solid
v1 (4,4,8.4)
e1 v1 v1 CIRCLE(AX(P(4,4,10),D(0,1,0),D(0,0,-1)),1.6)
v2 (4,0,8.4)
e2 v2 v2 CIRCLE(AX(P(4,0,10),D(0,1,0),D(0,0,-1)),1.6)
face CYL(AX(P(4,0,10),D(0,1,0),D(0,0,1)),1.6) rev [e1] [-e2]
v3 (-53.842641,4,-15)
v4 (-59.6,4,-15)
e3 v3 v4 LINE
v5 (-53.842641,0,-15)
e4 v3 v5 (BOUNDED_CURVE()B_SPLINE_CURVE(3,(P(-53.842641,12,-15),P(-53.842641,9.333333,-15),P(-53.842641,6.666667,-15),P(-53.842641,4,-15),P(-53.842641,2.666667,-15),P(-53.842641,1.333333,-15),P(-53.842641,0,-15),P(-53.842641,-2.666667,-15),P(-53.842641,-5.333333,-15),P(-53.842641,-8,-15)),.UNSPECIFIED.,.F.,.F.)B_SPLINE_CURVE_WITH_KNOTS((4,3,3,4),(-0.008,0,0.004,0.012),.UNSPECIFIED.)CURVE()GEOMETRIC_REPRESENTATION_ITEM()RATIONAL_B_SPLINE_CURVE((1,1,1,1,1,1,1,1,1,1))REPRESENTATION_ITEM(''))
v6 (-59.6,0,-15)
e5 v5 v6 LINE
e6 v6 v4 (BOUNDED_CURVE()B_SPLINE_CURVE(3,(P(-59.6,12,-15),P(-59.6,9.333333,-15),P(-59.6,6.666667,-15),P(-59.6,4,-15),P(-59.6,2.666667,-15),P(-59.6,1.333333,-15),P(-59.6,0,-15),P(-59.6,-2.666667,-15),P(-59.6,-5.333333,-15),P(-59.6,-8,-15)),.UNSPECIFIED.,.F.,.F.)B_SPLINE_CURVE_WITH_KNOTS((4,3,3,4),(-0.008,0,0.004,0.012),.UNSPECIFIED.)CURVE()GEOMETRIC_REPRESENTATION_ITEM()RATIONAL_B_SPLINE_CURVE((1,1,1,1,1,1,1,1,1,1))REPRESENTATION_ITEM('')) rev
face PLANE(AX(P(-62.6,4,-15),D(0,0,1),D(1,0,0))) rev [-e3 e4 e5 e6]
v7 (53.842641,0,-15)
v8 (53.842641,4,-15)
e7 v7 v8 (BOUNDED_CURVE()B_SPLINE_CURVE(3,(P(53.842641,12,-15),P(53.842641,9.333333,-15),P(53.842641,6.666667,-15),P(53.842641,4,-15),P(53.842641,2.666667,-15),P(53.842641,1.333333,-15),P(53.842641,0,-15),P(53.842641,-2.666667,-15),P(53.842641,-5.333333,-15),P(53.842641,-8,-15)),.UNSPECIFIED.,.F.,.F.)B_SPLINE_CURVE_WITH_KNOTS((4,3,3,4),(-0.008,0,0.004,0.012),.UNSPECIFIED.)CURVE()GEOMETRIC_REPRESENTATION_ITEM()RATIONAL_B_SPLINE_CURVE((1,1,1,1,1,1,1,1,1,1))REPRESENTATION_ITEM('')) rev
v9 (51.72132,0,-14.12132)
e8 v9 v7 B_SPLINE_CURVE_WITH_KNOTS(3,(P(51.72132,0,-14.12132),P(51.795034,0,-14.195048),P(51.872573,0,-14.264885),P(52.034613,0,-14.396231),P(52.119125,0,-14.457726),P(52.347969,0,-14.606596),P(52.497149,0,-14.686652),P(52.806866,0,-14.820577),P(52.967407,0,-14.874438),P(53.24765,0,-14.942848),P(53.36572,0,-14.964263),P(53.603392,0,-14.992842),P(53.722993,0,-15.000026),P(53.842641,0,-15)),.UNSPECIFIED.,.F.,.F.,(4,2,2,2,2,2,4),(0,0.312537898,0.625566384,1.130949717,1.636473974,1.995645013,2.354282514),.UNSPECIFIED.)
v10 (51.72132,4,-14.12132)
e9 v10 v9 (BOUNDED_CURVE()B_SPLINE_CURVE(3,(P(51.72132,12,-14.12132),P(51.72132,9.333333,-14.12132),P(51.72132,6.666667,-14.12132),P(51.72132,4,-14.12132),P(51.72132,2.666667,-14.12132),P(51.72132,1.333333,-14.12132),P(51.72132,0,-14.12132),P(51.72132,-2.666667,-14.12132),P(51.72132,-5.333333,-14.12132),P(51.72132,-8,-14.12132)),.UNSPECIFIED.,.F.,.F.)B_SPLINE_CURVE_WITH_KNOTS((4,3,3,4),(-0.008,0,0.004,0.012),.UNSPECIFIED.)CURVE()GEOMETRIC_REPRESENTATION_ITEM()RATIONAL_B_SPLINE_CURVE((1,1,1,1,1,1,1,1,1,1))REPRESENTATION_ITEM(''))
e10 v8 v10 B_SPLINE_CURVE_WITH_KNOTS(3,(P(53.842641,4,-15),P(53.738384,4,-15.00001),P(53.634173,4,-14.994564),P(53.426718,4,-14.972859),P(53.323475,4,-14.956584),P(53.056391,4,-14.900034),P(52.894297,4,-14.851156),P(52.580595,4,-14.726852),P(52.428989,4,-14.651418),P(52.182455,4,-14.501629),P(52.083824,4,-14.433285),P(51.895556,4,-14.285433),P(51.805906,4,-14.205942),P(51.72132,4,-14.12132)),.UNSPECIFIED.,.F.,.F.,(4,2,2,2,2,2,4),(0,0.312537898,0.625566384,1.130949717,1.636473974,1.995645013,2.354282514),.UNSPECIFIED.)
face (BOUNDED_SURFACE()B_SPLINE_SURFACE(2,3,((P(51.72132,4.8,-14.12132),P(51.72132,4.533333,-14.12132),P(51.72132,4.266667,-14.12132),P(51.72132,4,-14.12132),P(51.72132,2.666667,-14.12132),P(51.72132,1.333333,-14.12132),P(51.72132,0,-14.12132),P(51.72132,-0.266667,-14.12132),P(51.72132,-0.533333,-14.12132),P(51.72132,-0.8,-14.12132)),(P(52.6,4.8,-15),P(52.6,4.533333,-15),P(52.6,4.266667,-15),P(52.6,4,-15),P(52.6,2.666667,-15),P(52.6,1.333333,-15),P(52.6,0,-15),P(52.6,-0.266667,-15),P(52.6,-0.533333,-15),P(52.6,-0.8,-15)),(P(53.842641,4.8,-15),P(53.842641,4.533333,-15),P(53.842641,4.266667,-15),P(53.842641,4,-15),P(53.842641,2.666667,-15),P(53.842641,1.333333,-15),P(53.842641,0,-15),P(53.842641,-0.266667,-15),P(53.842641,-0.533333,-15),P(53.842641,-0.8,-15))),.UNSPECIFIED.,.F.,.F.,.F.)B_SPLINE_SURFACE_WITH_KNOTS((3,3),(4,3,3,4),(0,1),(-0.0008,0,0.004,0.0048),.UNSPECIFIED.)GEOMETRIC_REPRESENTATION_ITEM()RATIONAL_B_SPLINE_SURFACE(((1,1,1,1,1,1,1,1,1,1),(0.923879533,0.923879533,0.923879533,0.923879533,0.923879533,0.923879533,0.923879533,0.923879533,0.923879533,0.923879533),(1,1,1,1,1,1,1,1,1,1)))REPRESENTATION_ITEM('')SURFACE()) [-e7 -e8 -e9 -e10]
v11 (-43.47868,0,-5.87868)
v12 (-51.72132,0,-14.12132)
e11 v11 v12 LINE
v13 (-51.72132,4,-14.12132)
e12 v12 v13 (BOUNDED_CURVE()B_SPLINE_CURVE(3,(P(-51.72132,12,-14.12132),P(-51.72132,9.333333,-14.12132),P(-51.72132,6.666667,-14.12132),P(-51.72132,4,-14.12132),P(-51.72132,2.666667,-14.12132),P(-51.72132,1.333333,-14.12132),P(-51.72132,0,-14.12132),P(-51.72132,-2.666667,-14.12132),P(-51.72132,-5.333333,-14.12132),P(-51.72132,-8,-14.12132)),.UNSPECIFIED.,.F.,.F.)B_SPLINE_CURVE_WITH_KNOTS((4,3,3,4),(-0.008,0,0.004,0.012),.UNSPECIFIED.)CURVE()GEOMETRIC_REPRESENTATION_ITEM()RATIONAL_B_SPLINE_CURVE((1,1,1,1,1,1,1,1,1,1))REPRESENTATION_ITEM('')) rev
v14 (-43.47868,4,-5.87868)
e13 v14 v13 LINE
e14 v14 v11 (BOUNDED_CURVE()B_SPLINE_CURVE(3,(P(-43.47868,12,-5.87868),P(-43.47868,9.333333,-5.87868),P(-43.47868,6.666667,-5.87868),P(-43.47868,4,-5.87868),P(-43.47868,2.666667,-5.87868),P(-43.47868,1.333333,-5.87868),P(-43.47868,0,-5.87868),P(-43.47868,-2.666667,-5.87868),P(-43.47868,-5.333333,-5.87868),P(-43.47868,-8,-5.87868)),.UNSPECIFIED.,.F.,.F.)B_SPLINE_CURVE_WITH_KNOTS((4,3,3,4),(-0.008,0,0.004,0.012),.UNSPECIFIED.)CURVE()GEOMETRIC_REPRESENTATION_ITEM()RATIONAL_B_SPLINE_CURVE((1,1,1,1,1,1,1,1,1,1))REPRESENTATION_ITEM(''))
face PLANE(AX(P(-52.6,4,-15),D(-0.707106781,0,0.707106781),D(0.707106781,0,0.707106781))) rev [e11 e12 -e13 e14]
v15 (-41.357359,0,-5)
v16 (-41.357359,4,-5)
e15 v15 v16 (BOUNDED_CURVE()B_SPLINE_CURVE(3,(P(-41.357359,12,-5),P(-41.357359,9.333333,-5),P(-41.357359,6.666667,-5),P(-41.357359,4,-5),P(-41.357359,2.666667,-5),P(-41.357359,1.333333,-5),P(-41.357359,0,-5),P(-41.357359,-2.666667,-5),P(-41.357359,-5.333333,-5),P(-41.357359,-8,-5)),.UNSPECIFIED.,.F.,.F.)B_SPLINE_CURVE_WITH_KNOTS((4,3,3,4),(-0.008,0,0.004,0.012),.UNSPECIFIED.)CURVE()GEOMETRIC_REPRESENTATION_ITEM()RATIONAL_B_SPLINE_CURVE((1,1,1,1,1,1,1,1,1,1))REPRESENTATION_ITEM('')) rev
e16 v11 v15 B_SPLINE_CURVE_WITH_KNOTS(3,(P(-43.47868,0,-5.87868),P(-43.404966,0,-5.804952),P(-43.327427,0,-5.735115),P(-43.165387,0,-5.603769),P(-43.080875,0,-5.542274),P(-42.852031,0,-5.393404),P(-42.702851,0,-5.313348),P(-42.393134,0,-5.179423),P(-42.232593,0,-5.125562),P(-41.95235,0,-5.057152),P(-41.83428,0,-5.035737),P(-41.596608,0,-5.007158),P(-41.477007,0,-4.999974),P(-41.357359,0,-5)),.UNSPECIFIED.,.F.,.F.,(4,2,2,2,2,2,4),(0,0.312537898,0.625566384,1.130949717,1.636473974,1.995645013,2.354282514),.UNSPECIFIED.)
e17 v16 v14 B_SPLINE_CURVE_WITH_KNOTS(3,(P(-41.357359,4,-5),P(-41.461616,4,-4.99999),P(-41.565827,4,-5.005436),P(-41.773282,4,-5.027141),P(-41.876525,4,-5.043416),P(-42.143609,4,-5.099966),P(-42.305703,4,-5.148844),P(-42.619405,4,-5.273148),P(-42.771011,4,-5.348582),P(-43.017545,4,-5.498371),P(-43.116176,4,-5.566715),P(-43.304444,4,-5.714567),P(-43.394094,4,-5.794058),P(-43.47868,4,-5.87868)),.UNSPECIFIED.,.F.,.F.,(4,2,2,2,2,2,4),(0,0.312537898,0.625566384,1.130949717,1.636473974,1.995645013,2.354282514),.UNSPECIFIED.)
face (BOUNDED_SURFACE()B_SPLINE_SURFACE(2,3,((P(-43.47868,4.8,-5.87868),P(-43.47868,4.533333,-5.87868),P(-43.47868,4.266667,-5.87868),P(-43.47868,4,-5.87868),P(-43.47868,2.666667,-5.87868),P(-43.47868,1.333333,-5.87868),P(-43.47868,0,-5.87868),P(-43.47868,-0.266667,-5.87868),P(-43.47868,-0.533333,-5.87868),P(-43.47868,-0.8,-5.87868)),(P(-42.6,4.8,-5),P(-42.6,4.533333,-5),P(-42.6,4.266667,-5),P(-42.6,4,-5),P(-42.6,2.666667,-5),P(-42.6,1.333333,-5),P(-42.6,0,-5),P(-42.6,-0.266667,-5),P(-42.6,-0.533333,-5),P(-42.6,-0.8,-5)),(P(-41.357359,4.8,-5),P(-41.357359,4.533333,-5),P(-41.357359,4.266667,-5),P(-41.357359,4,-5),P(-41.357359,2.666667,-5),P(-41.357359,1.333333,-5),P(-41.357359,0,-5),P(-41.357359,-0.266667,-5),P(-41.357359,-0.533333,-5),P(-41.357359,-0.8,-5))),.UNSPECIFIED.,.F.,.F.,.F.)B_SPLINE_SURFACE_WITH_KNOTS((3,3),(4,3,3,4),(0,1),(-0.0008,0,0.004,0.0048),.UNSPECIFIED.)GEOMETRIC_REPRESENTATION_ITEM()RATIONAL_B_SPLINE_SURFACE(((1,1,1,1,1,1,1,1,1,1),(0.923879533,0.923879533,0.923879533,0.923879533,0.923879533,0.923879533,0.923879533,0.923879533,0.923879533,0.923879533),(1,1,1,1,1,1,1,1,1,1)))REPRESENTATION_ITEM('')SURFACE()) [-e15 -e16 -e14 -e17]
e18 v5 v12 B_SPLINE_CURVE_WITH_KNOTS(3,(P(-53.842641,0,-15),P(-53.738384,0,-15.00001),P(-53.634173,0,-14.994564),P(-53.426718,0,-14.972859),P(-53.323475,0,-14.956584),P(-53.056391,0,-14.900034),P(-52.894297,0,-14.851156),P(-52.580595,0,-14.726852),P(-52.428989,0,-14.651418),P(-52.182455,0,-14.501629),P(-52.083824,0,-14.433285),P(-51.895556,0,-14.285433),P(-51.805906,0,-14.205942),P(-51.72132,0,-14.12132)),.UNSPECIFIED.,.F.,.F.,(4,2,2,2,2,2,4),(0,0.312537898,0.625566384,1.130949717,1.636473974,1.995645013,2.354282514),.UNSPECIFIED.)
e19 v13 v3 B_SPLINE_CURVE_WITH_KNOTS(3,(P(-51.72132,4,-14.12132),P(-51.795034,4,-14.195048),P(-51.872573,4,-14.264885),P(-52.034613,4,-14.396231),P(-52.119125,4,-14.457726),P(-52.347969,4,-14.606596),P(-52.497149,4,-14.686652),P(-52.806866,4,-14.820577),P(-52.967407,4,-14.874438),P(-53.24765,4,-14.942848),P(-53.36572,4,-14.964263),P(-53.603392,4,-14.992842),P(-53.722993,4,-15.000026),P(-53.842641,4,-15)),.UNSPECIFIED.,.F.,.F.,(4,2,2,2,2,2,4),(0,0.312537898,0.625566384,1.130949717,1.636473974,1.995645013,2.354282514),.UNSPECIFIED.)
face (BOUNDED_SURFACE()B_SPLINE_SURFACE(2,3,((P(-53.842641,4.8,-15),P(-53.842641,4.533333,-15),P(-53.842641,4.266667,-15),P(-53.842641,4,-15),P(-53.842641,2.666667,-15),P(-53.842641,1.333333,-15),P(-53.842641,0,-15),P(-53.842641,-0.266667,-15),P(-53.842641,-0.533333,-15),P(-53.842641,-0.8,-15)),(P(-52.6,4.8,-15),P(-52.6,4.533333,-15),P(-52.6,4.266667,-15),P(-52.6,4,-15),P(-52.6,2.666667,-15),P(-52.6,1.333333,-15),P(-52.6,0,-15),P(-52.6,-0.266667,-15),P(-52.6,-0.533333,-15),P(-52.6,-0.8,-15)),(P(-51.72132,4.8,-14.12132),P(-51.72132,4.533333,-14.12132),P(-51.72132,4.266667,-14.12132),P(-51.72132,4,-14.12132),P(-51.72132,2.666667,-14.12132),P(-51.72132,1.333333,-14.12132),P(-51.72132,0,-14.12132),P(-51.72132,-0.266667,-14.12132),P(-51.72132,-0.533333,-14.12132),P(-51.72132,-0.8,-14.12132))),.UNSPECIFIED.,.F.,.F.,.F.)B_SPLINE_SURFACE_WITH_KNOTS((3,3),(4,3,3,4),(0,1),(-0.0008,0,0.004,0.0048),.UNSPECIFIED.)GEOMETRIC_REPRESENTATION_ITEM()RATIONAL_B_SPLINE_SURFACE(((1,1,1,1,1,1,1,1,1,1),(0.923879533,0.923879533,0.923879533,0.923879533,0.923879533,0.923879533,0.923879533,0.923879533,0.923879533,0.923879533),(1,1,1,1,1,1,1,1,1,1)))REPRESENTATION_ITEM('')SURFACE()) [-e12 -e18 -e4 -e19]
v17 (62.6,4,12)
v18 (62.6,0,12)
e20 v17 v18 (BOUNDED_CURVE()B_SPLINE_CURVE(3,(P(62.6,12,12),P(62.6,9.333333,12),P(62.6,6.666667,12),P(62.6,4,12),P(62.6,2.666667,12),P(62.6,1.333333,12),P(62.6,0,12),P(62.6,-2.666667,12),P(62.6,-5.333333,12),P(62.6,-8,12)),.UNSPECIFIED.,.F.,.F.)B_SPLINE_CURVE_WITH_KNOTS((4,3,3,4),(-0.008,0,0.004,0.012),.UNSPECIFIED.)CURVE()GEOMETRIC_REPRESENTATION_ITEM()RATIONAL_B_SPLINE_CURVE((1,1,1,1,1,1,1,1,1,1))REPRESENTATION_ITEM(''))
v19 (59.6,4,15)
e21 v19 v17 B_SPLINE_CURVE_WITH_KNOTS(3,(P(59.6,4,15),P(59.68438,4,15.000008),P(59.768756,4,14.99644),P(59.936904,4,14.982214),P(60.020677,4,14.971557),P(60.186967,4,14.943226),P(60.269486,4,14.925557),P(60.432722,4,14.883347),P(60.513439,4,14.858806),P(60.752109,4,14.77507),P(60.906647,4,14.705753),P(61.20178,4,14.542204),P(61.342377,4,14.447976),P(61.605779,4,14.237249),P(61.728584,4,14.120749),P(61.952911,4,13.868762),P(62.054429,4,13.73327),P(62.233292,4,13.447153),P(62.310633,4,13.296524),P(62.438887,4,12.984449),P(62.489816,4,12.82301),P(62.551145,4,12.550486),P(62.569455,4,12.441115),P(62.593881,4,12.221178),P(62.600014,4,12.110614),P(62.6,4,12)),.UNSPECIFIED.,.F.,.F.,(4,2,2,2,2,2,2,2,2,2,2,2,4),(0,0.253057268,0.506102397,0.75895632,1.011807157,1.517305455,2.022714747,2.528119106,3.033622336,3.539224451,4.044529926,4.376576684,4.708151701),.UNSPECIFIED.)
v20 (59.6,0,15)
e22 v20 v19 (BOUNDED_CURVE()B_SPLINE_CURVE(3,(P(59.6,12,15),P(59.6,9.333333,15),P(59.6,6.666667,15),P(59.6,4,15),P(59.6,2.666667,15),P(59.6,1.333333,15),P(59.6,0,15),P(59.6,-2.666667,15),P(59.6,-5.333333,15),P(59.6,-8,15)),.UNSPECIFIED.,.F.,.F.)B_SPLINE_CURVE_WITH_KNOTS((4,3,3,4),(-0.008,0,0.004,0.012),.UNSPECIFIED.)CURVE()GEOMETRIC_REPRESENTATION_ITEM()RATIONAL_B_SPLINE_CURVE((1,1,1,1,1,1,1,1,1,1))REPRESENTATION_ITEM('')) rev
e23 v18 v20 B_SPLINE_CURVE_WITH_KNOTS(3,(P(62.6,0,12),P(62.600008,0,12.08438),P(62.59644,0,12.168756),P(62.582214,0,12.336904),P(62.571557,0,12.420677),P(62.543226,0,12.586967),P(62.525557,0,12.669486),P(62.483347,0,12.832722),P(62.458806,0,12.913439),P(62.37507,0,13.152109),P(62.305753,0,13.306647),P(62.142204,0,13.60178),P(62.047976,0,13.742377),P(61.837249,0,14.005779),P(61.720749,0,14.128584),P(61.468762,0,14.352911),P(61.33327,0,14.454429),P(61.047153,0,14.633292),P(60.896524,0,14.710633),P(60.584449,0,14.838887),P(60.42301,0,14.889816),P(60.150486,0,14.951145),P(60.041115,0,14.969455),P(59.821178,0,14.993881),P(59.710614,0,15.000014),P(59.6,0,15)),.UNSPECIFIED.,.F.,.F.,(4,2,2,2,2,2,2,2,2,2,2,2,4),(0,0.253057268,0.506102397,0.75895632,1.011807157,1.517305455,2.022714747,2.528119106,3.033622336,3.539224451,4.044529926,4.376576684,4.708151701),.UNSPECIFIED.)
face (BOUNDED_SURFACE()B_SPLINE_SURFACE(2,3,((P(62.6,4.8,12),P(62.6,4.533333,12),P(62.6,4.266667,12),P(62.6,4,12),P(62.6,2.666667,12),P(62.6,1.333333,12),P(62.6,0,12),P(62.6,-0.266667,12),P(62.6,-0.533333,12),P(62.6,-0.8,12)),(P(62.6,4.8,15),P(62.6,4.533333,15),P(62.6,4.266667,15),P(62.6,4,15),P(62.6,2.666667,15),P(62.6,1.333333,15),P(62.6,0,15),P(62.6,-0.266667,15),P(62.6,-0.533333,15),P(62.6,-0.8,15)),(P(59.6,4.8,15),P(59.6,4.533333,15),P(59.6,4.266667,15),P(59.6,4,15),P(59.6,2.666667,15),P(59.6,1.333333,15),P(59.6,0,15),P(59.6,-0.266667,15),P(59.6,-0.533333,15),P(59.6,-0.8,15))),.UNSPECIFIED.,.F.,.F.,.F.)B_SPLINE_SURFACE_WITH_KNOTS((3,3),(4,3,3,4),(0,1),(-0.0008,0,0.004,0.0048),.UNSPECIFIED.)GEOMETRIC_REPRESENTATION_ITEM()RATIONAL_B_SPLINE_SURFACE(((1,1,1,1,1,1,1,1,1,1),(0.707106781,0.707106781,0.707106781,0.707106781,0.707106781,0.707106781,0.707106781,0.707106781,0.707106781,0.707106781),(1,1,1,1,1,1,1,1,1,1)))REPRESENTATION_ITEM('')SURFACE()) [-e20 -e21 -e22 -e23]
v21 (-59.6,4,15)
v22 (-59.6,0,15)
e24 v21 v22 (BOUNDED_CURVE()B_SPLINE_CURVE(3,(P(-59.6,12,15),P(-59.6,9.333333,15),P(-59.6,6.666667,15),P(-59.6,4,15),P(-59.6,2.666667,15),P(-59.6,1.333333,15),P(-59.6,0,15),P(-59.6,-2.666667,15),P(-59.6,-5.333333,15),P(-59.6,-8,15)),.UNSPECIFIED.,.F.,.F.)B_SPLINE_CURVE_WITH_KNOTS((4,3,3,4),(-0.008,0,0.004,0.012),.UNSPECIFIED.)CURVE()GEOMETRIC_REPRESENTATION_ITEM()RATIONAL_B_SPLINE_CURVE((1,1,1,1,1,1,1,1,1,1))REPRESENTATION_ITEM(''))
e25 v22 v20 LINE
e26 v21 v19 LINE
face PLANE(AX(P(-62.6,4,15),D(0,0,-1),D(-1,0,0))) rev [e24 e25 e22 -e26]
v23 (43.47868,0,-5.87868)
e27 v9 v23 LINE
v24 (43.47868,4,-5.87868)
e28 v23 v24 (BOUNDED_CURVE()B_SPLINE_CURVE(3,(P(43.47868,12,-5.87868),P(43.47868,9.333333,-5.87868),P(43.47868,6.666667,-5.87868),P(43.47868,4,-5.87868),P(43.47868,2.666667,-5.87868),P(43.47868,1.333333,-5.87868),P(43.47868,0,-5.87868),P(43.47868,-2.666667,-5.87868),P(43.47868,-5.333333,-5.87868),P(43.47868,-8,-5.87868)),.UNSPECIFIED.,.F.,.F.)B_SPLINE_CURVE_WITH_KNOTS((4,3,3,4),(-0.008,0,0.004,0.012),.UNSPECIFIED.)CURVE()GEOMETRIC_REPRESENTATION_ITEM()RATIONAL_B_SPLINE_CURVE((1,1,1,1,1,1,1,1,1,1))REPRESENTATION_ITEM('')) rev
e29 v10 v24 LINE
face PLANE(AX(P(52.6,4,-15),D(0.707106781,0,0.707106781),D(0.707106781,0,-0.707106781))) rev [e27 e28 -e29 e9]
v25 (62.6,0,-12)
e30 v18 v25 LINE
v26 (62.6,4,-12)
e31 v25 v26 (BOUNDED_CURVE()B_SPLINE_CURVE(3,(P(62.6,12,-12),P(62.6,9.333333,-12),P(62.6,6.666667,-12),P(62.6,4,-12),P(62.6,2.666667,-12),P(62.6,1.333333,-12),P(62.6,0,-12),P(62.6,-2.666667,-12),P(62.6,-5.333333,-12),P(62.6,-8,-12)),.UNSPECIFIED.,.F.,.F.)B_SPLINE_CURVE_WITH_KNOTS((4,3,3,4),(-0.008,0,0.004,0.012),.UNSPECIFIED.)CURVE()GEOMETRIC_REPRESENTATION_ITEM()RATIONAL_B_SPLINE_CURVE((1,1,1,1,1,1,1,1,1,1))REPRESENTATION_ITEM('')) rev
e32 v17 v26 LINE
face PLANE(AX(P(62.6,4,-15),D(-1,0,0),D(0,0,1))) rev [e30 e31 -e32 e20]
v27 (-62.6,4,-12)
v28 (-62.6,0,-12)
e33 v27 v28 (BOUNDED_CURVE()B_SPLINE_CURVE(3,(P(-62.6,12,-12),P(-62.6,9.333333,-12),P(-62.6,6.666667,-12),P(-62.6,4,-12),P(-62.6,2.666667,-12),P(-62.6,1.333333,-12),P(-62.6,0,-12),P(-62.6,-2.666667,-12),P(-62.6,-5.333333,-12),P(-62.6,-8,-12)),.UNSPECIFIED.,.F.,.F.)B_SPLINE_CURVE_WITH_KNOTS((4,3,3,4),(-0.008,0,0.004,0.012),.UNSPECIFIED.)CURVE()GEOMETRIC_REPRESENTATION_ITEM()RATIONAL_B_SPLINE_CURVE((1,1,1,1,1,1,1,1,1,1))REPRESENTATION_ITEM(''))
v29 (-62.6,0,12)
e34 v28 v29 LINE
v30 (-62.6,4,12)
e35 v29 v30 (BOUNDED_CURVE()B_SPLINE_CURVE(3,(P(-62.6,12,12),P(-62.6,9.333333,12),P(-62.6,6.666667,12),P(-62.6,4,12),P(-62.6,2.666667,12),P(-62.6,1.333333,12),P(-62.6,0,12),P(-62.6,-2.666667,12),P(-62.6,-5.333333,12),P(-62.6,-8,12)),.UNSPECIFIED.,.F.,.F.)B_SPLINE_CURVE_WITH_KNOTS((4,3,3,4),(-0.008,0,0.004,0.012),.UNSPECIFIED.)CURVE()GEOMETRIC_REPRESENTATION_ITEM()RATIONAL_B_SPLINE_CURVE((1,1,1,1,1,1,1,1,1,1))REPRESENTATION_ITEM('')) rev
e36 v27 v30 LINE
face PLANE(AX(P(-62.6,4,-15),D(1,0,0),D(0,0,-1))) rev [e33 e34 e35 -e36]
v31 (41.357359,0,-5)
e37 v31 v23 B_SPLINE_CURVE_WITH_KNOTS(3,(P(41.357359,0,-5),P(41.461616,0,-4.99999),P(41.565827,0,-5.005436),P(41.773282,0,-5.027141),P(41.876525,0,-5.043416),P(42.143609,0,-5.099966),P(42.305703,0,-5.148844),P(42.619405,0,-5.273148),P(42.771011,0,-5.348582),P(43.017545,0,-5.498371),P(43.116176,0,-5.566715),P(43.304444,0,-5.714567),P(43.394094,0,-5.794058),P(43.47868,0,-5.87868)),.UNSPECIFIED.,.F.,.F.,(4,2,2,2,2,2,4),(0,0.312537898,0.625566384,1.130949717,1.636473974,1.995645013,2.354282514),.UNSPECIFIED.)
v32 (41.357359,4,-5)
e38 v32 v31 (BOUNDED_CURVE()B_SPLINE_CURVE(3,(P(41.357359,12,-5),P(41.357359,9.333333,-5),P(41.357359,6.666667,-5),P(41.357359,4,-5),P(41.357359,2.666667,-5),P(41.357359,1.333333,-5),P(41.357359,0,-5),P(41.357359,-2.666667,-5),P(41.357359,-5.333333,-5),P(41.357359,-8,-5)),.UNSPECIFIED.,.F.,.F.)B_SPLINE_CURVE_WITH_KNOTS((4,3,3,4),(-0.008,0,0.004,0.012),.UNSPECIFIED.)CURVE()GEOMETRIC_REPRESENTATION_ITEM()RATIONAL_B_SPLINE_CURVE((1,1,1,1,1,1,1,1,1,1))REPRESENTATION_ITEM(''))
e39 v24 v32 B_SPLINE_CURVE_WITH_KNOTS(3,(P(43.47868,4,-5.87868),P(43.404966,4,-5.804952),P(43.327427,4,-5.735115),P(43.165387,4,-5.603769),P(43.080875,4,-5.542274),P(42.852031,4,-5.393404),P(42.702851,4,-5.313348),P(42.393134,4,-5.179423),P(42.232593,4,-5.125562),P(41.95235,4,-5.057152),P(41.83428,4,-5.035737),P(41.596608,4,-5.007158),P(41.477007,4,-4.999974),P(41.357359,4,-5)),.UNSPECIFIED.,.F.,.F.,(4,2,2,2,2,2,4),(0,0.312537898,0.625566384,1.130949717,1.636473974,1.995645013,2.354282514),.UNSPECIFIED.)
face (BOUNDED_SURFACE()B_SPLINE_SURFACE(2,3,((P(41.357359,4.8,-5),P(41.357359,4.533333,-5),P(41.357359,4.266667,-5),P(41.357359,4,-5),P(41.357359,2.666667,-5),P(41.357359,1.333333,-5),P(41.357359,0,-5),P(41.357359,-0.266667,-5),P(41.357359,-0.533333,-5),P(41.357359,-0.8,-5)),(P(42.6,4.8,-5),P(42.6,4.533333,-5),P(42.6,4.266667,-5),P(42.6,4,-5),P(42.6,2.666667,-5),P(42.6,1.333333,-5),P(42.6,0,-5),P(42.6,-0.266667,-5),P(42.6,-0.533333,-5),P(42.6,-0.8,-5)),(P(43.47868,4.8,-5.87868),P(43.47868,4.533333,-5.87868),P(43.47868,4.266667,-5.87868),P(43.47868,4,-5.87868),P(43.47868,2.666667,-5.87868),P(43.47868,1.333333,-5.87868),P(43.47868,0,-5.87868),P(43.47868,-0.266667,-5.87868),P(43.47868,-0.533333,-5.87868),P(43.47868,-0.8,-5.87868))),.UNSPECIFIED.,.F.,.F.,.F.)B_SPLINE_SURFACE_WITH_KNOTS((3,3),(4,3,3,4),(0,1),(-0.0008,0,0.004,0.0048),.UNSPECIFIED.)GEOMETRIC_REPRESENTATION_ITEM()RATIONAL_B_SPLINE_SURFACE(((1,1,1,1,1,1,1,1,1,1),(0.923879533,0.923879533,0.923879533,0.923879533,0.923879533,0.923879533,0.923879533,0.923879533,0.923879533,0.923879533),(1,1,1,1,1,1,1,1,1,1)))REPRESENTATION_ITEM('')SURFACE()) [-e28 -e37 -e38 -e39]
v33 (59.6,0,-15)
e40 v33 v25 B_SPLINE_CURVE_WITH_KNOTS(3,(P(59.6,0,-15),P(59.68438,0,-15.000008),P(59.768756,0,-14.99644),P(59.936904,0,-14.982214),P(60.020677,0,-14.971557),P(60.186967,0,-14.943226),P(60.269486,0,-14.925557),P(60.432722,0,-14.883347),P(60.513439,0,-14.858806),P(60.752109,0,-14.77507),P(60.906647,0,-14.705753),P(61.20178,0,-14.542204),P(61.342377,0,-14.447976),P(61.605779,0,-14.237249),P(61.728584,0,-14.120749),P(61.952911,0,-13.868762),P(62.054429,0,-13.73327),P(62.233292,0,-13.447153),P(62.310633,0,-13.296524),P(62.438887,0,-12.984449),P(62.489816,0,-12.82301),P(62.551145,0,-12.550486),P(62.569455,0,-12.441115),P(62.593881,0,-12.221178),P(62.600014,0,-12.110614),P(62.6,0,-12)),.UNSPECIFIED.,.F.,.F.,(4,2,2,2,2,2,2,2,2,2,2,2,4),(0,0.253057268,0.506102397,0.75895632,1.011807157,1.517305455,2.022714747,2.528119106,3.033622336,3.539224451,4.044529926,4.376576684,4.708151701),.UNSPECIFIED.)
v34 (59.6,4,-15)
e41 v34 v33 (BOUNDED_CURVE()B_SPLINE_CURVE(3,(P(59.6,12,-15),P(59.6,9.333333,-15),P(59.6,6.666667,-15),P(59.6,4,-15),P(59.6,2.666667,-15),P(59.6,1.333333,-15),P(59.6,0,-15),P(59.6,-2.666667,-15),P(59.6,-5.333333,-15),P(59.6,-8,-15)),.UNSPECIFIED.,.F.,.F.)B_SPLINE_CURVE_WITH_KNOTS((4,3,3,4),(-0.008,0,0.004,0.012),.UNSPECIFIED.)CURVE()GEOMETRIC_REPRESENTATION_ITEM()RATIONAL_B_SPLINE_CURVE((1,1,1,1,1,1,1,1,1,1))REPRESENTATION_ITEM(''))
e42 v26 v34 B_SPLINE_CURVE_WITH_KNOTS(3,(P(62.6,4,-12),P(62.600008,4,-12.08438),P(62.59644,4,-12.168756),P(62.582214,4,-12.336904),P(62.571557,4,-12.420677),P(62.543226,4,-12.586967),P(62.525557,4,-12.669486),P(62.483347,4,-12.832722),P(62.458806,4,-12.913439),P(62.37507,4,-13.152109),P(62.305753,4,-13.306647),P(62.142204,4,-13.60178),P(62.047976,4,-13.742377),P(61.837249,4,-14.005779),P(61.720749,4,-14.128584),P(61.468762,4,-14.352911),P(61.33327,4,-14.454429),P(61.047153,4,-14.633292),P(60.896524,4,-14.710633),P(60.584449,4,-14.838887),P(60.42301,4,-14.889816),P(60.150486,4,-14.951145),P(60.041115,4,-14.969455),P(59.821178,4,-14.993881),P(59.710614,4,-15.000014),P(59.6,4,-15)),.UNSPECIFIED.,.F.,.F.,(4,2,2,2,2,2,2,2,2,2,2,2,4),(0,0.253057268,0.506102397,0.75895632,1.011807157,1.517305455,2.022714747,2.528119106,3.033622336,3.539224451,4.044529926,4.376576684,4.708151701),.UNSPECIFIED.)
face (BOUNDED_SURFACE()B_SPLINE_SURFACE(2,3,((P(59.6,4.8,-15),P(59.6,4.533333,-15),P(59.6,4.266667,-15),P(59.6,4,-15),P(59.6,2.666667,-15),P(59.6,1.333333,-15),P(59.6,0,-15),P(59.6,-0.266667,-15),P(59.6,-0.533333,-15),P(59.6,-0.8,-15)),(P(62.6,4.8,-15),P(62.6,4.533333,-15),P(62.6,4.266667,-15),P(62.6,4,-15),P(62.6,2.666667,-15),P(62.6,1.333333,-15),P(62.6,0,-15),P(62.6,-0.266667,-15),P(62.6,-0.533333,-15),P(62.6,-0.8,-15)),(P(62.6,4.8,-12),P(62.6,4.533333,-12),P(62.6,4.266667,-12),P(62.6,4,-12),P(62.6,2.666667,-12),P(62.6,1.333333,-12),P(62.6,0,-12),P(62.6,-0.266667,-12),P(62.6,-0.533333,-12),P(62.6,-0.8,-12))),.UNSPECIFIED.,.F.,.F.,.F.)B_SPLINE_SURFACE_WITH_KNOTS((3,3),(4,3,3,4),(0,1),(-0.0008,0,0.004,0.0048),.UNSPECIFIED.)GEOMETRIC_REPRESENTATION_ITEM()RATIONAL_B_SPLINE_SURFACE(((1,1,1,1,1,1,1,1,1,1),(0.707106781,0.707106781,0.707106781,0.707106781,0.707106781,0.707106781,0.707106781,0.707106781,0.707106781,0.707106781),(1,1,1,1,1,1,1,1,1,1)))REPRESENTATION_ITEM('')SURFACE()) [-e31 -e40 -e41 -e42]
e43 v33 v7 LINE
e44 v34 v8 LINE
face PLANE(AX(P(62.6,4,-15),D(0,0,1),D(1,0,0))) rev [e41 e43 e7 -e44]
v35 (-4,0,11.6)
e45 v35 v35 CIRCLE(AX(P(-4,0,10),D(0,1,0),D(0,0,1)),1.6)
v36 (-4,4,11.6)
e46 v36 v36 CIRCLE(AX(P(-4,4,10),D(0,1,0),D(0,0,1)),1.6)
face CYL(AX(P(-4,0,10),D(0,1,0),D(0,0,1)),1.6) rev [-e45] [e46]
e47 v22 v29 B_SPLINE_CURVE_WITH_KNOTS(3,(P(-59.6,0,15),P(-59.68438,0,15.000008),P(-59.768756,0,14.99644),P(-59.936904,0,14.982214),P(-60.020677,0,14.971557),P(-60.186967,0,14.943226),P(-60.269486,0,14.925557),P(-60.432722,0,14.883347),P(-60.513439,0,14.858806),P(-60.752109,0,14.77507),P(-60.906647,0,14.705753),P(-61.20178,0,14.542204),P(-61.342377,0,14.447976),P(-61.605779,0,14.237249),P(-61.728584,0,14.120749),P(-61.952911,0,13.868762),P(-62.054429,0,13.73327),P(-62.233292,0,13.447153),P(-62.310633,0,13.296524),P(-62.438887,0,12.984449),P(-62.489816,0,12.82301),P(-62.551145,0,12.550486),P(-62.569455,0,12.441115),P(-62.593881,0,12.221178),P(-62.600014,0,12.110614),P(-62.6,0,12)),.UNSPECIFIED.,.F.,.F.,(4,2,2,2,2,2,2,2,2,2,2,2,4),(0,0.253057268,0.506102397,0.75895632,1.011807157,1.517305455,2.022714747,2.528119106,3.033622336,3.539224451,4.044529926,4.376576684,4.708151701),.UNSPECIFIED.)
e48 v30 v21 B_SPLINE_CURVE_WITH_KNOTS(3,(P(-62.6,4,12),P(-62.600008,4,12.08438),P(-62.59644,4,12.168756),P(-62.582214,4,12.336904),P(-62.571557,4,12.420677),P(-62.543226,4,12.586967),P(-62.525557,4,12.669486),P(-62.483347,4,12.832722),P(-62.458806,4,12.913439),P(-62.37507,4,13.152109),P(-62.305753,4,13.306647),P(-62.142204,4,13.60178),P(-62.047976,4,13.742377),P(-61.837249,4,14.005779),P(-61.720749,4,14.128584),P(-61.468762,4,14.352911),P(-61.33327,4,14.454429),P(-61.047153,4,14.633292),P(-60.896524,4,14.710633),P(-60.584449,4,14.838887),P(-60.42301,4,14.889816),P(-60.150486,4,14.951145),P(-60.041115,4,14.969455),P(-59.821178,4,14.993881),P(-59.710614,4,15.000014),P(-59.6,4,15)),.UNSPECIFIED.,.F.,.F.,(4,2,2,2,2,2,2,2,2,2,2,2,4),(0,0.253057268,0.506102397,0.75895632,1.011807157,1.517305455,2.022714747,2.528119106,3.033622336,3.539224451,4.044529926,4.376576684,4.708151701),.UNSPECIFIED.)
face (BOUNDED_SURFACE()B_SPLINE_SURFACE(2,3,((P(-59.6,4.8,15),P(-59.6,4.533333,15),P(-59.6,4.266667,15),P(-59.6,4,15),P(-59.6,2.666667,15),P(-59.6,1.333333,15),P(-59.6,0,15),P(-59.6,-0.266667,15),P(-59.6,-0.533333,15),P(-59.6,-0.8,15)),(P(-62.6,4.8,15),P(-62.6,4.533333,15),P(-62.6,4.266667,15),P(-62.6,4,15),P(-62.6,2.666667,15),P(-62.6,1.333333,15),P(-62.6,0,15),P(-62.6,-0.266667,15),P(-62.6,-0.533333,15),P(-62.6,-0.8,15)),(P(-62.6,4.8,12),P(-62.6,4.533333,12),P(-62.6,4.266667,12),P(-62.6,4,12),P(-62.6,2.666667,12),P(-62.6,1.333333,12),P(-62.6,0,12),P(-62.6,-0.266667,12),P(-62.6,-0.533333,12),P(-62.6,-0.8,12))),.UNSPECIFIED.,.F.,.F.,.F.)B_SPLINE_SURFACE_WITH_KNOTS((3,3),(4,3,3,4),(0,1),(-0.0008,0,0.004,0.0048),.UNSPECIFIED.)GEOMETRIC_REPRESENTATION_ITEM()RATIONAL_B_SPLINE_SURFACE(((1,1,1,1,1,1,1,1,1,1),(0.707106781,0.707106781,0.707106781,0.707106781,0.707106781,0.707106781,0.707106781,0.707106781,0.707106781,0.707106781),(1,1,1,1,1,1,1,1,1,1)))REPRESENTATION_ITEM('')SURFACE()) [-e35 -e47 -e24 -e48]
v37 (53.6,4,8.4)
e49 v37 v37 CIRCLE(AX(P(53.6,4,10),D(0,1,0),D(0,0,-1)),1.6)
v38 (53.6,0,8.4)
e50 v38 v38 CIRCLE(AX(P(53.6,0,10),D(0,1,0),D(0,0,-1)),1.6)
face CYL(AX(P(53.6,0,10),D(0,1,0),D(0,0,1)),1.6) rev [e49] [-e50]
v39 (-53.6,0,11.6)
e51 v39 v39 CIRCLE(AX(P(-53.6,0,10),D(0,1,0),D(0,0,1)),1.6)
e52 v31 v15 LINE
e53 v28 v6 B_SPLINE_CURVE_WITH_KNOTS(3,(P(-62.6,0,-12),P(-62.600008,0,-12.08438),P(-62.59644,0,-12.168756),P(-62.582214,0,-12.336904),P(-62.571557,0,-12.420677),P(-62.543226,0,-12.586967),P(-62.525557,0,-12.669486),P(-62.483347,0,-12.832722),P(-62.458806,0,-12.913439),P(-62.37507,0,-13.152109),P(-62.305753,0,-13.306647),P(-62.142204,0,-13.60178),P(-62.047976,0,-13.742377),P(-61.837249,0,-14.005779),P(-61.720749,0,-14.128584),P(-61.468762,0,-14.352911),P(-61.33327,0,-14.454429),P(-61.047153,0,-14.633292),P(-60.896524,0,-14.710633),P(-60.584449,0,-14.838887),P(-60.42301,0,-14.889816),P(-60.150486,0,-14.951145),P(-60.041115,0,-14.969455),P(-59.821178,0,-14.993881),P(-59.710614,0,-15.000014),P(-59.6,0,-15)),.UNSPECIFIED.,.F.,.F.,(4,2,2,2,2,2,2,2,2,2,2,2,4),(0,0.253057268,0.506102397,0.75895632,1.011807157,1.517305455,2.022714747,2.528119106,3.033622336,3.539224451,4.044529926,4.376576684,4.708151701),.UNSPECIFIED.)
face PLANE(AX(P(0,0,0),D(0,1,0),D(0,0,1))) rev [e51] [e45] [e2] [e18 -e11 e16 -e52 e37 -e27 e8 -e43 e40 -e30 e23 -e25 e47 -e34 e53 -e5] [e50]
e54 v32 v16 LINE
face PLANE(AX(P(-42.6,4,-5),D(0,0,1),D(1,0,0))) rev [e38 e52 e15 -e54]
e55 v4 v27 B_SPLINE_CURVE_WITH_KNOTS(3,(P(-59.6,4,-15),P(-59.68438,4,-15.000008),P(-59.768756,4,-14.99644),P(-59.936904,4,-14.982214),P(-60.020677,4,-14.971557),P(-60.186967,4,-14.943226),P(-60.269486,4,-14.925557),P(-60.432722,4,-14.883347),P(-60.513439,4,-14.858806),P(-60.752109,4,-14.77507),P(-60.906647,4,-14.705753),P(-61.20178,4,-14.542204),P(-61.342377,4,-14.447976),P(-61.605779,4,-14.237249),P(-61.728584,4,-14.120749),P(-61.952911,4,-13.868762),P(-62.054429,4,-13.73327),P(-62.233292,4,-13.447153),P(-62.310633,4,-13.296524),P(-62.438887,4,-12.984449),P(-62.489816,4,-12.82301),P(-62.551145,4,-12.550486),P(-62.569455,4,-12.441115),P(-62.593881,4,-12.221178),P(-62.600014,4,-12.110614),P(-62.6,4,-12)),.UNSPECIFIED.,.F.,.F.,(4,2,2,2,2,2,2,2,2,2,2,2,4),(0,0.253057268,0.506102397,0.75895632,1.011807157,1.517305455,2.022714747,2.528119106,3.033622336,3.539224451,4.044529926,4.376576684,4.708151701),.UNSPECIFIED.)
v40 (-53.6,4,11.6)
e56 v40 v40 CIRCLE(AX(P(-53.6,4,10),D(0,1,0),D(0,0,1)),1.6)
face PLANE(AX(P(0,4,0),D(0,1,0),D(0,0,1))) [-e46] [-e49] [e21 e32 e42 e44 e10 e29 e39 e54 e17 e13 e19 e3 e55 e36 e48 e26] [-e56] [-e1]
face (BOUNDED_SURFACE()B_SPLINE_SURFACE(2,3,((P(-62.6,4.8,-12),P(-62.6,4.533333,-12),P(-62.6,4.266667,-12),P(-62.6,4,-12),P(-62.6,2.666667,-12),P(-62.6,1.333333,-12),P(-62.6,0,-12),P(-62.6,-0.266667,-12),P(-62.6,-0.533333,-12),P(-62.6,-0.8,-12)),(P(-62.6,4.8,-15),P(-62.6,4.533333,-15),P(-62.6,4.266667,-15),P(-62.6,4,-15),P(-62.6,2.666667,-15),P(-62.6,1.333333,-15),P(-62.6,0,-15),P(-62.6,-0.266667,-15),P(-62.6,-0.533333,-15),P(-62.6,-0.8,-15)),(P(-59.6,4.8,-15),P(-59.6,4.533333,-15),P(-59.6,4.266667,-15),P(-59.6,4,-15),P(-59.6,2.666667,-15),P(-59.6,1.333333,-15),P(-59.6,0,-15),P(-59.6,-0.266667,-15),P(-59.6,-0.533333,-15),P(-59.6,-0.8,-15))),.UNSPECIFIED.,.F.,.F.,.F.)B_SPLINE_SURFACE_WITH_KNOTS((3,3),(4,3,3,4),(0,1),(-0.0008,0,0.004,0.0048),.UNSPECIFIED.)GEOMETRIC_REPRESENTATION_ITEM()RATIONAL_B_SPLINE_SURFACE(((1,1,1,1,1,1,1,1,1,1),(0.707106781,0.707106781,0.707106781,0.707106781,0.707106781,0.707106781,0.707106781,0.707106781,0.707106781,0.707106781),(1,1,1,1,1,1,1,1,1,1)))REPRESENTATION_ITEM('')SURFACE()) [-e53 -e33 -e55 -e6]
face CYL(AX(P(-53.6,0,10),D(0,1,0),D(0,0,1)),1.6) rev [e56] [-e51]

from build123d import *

# Parameters (mm, degrees)
EXTRUDE_2_DEPTH     = 4
SKETCH_6_R          = 1.6
CUT_EXTRUDE_2_DEPTH = 4
FILLET_2_R          = 3


with BuildPart() as part:
    # 草图1 → 凸台-拉伸2 (new body)
    with BuildSketch(Plane(origin=(0, 0, 0), x_dir=(1, 0, 0), z_dir=(0, 1, 0))):
        Polygon((-62.6, 15), (-52.6, 15), (-42.6, 5), (42.6, 5), (52.6, 15), (62.6, 15), (62.6, -15), (-62.6, -15), align=None)
    extrude(amount=EXTRUDE_2_DEPTH)

    # 草图6 → 切除-拉伸2 (cut)
    with BuildSketch(Plane(origin=(0, 4, 0), x_dir=(1, 0, 0), z_dir=(0, 1, 0))):
        with Locations((-53.6, -10)):
            Circle(SKETCH_6_R)
        with Locations((-4, -10)):
            Circle(SKETCH_6_R)
        with Locations((4, -10)):
            Circle(SKETCH_6_R)
        with Locations((53.6, -10)):
            Circle(SKETCH_6_R)
    extrude(amount=-CUT_EXTRUDE_2_DEPTH, mode=Mode.SUBTRACT)

    # 圆角2
    fillet_2_edges = [part.edges().sort_by_distance(p)[0] for p in [
        (62.6, 2, 15),
        (-62.6, 2, 15),
        (-52.6, 2, -15),
        (-42.6, 2, -5),
        (42.6, 2, -5),
        (52.6, 2, -15),
        (62.6, 2, -15),
        (-62.6, 2, -15),
    ]]
    fillet(fillet_2_edges, radius=FILLET_2_R)


solid = part.part
